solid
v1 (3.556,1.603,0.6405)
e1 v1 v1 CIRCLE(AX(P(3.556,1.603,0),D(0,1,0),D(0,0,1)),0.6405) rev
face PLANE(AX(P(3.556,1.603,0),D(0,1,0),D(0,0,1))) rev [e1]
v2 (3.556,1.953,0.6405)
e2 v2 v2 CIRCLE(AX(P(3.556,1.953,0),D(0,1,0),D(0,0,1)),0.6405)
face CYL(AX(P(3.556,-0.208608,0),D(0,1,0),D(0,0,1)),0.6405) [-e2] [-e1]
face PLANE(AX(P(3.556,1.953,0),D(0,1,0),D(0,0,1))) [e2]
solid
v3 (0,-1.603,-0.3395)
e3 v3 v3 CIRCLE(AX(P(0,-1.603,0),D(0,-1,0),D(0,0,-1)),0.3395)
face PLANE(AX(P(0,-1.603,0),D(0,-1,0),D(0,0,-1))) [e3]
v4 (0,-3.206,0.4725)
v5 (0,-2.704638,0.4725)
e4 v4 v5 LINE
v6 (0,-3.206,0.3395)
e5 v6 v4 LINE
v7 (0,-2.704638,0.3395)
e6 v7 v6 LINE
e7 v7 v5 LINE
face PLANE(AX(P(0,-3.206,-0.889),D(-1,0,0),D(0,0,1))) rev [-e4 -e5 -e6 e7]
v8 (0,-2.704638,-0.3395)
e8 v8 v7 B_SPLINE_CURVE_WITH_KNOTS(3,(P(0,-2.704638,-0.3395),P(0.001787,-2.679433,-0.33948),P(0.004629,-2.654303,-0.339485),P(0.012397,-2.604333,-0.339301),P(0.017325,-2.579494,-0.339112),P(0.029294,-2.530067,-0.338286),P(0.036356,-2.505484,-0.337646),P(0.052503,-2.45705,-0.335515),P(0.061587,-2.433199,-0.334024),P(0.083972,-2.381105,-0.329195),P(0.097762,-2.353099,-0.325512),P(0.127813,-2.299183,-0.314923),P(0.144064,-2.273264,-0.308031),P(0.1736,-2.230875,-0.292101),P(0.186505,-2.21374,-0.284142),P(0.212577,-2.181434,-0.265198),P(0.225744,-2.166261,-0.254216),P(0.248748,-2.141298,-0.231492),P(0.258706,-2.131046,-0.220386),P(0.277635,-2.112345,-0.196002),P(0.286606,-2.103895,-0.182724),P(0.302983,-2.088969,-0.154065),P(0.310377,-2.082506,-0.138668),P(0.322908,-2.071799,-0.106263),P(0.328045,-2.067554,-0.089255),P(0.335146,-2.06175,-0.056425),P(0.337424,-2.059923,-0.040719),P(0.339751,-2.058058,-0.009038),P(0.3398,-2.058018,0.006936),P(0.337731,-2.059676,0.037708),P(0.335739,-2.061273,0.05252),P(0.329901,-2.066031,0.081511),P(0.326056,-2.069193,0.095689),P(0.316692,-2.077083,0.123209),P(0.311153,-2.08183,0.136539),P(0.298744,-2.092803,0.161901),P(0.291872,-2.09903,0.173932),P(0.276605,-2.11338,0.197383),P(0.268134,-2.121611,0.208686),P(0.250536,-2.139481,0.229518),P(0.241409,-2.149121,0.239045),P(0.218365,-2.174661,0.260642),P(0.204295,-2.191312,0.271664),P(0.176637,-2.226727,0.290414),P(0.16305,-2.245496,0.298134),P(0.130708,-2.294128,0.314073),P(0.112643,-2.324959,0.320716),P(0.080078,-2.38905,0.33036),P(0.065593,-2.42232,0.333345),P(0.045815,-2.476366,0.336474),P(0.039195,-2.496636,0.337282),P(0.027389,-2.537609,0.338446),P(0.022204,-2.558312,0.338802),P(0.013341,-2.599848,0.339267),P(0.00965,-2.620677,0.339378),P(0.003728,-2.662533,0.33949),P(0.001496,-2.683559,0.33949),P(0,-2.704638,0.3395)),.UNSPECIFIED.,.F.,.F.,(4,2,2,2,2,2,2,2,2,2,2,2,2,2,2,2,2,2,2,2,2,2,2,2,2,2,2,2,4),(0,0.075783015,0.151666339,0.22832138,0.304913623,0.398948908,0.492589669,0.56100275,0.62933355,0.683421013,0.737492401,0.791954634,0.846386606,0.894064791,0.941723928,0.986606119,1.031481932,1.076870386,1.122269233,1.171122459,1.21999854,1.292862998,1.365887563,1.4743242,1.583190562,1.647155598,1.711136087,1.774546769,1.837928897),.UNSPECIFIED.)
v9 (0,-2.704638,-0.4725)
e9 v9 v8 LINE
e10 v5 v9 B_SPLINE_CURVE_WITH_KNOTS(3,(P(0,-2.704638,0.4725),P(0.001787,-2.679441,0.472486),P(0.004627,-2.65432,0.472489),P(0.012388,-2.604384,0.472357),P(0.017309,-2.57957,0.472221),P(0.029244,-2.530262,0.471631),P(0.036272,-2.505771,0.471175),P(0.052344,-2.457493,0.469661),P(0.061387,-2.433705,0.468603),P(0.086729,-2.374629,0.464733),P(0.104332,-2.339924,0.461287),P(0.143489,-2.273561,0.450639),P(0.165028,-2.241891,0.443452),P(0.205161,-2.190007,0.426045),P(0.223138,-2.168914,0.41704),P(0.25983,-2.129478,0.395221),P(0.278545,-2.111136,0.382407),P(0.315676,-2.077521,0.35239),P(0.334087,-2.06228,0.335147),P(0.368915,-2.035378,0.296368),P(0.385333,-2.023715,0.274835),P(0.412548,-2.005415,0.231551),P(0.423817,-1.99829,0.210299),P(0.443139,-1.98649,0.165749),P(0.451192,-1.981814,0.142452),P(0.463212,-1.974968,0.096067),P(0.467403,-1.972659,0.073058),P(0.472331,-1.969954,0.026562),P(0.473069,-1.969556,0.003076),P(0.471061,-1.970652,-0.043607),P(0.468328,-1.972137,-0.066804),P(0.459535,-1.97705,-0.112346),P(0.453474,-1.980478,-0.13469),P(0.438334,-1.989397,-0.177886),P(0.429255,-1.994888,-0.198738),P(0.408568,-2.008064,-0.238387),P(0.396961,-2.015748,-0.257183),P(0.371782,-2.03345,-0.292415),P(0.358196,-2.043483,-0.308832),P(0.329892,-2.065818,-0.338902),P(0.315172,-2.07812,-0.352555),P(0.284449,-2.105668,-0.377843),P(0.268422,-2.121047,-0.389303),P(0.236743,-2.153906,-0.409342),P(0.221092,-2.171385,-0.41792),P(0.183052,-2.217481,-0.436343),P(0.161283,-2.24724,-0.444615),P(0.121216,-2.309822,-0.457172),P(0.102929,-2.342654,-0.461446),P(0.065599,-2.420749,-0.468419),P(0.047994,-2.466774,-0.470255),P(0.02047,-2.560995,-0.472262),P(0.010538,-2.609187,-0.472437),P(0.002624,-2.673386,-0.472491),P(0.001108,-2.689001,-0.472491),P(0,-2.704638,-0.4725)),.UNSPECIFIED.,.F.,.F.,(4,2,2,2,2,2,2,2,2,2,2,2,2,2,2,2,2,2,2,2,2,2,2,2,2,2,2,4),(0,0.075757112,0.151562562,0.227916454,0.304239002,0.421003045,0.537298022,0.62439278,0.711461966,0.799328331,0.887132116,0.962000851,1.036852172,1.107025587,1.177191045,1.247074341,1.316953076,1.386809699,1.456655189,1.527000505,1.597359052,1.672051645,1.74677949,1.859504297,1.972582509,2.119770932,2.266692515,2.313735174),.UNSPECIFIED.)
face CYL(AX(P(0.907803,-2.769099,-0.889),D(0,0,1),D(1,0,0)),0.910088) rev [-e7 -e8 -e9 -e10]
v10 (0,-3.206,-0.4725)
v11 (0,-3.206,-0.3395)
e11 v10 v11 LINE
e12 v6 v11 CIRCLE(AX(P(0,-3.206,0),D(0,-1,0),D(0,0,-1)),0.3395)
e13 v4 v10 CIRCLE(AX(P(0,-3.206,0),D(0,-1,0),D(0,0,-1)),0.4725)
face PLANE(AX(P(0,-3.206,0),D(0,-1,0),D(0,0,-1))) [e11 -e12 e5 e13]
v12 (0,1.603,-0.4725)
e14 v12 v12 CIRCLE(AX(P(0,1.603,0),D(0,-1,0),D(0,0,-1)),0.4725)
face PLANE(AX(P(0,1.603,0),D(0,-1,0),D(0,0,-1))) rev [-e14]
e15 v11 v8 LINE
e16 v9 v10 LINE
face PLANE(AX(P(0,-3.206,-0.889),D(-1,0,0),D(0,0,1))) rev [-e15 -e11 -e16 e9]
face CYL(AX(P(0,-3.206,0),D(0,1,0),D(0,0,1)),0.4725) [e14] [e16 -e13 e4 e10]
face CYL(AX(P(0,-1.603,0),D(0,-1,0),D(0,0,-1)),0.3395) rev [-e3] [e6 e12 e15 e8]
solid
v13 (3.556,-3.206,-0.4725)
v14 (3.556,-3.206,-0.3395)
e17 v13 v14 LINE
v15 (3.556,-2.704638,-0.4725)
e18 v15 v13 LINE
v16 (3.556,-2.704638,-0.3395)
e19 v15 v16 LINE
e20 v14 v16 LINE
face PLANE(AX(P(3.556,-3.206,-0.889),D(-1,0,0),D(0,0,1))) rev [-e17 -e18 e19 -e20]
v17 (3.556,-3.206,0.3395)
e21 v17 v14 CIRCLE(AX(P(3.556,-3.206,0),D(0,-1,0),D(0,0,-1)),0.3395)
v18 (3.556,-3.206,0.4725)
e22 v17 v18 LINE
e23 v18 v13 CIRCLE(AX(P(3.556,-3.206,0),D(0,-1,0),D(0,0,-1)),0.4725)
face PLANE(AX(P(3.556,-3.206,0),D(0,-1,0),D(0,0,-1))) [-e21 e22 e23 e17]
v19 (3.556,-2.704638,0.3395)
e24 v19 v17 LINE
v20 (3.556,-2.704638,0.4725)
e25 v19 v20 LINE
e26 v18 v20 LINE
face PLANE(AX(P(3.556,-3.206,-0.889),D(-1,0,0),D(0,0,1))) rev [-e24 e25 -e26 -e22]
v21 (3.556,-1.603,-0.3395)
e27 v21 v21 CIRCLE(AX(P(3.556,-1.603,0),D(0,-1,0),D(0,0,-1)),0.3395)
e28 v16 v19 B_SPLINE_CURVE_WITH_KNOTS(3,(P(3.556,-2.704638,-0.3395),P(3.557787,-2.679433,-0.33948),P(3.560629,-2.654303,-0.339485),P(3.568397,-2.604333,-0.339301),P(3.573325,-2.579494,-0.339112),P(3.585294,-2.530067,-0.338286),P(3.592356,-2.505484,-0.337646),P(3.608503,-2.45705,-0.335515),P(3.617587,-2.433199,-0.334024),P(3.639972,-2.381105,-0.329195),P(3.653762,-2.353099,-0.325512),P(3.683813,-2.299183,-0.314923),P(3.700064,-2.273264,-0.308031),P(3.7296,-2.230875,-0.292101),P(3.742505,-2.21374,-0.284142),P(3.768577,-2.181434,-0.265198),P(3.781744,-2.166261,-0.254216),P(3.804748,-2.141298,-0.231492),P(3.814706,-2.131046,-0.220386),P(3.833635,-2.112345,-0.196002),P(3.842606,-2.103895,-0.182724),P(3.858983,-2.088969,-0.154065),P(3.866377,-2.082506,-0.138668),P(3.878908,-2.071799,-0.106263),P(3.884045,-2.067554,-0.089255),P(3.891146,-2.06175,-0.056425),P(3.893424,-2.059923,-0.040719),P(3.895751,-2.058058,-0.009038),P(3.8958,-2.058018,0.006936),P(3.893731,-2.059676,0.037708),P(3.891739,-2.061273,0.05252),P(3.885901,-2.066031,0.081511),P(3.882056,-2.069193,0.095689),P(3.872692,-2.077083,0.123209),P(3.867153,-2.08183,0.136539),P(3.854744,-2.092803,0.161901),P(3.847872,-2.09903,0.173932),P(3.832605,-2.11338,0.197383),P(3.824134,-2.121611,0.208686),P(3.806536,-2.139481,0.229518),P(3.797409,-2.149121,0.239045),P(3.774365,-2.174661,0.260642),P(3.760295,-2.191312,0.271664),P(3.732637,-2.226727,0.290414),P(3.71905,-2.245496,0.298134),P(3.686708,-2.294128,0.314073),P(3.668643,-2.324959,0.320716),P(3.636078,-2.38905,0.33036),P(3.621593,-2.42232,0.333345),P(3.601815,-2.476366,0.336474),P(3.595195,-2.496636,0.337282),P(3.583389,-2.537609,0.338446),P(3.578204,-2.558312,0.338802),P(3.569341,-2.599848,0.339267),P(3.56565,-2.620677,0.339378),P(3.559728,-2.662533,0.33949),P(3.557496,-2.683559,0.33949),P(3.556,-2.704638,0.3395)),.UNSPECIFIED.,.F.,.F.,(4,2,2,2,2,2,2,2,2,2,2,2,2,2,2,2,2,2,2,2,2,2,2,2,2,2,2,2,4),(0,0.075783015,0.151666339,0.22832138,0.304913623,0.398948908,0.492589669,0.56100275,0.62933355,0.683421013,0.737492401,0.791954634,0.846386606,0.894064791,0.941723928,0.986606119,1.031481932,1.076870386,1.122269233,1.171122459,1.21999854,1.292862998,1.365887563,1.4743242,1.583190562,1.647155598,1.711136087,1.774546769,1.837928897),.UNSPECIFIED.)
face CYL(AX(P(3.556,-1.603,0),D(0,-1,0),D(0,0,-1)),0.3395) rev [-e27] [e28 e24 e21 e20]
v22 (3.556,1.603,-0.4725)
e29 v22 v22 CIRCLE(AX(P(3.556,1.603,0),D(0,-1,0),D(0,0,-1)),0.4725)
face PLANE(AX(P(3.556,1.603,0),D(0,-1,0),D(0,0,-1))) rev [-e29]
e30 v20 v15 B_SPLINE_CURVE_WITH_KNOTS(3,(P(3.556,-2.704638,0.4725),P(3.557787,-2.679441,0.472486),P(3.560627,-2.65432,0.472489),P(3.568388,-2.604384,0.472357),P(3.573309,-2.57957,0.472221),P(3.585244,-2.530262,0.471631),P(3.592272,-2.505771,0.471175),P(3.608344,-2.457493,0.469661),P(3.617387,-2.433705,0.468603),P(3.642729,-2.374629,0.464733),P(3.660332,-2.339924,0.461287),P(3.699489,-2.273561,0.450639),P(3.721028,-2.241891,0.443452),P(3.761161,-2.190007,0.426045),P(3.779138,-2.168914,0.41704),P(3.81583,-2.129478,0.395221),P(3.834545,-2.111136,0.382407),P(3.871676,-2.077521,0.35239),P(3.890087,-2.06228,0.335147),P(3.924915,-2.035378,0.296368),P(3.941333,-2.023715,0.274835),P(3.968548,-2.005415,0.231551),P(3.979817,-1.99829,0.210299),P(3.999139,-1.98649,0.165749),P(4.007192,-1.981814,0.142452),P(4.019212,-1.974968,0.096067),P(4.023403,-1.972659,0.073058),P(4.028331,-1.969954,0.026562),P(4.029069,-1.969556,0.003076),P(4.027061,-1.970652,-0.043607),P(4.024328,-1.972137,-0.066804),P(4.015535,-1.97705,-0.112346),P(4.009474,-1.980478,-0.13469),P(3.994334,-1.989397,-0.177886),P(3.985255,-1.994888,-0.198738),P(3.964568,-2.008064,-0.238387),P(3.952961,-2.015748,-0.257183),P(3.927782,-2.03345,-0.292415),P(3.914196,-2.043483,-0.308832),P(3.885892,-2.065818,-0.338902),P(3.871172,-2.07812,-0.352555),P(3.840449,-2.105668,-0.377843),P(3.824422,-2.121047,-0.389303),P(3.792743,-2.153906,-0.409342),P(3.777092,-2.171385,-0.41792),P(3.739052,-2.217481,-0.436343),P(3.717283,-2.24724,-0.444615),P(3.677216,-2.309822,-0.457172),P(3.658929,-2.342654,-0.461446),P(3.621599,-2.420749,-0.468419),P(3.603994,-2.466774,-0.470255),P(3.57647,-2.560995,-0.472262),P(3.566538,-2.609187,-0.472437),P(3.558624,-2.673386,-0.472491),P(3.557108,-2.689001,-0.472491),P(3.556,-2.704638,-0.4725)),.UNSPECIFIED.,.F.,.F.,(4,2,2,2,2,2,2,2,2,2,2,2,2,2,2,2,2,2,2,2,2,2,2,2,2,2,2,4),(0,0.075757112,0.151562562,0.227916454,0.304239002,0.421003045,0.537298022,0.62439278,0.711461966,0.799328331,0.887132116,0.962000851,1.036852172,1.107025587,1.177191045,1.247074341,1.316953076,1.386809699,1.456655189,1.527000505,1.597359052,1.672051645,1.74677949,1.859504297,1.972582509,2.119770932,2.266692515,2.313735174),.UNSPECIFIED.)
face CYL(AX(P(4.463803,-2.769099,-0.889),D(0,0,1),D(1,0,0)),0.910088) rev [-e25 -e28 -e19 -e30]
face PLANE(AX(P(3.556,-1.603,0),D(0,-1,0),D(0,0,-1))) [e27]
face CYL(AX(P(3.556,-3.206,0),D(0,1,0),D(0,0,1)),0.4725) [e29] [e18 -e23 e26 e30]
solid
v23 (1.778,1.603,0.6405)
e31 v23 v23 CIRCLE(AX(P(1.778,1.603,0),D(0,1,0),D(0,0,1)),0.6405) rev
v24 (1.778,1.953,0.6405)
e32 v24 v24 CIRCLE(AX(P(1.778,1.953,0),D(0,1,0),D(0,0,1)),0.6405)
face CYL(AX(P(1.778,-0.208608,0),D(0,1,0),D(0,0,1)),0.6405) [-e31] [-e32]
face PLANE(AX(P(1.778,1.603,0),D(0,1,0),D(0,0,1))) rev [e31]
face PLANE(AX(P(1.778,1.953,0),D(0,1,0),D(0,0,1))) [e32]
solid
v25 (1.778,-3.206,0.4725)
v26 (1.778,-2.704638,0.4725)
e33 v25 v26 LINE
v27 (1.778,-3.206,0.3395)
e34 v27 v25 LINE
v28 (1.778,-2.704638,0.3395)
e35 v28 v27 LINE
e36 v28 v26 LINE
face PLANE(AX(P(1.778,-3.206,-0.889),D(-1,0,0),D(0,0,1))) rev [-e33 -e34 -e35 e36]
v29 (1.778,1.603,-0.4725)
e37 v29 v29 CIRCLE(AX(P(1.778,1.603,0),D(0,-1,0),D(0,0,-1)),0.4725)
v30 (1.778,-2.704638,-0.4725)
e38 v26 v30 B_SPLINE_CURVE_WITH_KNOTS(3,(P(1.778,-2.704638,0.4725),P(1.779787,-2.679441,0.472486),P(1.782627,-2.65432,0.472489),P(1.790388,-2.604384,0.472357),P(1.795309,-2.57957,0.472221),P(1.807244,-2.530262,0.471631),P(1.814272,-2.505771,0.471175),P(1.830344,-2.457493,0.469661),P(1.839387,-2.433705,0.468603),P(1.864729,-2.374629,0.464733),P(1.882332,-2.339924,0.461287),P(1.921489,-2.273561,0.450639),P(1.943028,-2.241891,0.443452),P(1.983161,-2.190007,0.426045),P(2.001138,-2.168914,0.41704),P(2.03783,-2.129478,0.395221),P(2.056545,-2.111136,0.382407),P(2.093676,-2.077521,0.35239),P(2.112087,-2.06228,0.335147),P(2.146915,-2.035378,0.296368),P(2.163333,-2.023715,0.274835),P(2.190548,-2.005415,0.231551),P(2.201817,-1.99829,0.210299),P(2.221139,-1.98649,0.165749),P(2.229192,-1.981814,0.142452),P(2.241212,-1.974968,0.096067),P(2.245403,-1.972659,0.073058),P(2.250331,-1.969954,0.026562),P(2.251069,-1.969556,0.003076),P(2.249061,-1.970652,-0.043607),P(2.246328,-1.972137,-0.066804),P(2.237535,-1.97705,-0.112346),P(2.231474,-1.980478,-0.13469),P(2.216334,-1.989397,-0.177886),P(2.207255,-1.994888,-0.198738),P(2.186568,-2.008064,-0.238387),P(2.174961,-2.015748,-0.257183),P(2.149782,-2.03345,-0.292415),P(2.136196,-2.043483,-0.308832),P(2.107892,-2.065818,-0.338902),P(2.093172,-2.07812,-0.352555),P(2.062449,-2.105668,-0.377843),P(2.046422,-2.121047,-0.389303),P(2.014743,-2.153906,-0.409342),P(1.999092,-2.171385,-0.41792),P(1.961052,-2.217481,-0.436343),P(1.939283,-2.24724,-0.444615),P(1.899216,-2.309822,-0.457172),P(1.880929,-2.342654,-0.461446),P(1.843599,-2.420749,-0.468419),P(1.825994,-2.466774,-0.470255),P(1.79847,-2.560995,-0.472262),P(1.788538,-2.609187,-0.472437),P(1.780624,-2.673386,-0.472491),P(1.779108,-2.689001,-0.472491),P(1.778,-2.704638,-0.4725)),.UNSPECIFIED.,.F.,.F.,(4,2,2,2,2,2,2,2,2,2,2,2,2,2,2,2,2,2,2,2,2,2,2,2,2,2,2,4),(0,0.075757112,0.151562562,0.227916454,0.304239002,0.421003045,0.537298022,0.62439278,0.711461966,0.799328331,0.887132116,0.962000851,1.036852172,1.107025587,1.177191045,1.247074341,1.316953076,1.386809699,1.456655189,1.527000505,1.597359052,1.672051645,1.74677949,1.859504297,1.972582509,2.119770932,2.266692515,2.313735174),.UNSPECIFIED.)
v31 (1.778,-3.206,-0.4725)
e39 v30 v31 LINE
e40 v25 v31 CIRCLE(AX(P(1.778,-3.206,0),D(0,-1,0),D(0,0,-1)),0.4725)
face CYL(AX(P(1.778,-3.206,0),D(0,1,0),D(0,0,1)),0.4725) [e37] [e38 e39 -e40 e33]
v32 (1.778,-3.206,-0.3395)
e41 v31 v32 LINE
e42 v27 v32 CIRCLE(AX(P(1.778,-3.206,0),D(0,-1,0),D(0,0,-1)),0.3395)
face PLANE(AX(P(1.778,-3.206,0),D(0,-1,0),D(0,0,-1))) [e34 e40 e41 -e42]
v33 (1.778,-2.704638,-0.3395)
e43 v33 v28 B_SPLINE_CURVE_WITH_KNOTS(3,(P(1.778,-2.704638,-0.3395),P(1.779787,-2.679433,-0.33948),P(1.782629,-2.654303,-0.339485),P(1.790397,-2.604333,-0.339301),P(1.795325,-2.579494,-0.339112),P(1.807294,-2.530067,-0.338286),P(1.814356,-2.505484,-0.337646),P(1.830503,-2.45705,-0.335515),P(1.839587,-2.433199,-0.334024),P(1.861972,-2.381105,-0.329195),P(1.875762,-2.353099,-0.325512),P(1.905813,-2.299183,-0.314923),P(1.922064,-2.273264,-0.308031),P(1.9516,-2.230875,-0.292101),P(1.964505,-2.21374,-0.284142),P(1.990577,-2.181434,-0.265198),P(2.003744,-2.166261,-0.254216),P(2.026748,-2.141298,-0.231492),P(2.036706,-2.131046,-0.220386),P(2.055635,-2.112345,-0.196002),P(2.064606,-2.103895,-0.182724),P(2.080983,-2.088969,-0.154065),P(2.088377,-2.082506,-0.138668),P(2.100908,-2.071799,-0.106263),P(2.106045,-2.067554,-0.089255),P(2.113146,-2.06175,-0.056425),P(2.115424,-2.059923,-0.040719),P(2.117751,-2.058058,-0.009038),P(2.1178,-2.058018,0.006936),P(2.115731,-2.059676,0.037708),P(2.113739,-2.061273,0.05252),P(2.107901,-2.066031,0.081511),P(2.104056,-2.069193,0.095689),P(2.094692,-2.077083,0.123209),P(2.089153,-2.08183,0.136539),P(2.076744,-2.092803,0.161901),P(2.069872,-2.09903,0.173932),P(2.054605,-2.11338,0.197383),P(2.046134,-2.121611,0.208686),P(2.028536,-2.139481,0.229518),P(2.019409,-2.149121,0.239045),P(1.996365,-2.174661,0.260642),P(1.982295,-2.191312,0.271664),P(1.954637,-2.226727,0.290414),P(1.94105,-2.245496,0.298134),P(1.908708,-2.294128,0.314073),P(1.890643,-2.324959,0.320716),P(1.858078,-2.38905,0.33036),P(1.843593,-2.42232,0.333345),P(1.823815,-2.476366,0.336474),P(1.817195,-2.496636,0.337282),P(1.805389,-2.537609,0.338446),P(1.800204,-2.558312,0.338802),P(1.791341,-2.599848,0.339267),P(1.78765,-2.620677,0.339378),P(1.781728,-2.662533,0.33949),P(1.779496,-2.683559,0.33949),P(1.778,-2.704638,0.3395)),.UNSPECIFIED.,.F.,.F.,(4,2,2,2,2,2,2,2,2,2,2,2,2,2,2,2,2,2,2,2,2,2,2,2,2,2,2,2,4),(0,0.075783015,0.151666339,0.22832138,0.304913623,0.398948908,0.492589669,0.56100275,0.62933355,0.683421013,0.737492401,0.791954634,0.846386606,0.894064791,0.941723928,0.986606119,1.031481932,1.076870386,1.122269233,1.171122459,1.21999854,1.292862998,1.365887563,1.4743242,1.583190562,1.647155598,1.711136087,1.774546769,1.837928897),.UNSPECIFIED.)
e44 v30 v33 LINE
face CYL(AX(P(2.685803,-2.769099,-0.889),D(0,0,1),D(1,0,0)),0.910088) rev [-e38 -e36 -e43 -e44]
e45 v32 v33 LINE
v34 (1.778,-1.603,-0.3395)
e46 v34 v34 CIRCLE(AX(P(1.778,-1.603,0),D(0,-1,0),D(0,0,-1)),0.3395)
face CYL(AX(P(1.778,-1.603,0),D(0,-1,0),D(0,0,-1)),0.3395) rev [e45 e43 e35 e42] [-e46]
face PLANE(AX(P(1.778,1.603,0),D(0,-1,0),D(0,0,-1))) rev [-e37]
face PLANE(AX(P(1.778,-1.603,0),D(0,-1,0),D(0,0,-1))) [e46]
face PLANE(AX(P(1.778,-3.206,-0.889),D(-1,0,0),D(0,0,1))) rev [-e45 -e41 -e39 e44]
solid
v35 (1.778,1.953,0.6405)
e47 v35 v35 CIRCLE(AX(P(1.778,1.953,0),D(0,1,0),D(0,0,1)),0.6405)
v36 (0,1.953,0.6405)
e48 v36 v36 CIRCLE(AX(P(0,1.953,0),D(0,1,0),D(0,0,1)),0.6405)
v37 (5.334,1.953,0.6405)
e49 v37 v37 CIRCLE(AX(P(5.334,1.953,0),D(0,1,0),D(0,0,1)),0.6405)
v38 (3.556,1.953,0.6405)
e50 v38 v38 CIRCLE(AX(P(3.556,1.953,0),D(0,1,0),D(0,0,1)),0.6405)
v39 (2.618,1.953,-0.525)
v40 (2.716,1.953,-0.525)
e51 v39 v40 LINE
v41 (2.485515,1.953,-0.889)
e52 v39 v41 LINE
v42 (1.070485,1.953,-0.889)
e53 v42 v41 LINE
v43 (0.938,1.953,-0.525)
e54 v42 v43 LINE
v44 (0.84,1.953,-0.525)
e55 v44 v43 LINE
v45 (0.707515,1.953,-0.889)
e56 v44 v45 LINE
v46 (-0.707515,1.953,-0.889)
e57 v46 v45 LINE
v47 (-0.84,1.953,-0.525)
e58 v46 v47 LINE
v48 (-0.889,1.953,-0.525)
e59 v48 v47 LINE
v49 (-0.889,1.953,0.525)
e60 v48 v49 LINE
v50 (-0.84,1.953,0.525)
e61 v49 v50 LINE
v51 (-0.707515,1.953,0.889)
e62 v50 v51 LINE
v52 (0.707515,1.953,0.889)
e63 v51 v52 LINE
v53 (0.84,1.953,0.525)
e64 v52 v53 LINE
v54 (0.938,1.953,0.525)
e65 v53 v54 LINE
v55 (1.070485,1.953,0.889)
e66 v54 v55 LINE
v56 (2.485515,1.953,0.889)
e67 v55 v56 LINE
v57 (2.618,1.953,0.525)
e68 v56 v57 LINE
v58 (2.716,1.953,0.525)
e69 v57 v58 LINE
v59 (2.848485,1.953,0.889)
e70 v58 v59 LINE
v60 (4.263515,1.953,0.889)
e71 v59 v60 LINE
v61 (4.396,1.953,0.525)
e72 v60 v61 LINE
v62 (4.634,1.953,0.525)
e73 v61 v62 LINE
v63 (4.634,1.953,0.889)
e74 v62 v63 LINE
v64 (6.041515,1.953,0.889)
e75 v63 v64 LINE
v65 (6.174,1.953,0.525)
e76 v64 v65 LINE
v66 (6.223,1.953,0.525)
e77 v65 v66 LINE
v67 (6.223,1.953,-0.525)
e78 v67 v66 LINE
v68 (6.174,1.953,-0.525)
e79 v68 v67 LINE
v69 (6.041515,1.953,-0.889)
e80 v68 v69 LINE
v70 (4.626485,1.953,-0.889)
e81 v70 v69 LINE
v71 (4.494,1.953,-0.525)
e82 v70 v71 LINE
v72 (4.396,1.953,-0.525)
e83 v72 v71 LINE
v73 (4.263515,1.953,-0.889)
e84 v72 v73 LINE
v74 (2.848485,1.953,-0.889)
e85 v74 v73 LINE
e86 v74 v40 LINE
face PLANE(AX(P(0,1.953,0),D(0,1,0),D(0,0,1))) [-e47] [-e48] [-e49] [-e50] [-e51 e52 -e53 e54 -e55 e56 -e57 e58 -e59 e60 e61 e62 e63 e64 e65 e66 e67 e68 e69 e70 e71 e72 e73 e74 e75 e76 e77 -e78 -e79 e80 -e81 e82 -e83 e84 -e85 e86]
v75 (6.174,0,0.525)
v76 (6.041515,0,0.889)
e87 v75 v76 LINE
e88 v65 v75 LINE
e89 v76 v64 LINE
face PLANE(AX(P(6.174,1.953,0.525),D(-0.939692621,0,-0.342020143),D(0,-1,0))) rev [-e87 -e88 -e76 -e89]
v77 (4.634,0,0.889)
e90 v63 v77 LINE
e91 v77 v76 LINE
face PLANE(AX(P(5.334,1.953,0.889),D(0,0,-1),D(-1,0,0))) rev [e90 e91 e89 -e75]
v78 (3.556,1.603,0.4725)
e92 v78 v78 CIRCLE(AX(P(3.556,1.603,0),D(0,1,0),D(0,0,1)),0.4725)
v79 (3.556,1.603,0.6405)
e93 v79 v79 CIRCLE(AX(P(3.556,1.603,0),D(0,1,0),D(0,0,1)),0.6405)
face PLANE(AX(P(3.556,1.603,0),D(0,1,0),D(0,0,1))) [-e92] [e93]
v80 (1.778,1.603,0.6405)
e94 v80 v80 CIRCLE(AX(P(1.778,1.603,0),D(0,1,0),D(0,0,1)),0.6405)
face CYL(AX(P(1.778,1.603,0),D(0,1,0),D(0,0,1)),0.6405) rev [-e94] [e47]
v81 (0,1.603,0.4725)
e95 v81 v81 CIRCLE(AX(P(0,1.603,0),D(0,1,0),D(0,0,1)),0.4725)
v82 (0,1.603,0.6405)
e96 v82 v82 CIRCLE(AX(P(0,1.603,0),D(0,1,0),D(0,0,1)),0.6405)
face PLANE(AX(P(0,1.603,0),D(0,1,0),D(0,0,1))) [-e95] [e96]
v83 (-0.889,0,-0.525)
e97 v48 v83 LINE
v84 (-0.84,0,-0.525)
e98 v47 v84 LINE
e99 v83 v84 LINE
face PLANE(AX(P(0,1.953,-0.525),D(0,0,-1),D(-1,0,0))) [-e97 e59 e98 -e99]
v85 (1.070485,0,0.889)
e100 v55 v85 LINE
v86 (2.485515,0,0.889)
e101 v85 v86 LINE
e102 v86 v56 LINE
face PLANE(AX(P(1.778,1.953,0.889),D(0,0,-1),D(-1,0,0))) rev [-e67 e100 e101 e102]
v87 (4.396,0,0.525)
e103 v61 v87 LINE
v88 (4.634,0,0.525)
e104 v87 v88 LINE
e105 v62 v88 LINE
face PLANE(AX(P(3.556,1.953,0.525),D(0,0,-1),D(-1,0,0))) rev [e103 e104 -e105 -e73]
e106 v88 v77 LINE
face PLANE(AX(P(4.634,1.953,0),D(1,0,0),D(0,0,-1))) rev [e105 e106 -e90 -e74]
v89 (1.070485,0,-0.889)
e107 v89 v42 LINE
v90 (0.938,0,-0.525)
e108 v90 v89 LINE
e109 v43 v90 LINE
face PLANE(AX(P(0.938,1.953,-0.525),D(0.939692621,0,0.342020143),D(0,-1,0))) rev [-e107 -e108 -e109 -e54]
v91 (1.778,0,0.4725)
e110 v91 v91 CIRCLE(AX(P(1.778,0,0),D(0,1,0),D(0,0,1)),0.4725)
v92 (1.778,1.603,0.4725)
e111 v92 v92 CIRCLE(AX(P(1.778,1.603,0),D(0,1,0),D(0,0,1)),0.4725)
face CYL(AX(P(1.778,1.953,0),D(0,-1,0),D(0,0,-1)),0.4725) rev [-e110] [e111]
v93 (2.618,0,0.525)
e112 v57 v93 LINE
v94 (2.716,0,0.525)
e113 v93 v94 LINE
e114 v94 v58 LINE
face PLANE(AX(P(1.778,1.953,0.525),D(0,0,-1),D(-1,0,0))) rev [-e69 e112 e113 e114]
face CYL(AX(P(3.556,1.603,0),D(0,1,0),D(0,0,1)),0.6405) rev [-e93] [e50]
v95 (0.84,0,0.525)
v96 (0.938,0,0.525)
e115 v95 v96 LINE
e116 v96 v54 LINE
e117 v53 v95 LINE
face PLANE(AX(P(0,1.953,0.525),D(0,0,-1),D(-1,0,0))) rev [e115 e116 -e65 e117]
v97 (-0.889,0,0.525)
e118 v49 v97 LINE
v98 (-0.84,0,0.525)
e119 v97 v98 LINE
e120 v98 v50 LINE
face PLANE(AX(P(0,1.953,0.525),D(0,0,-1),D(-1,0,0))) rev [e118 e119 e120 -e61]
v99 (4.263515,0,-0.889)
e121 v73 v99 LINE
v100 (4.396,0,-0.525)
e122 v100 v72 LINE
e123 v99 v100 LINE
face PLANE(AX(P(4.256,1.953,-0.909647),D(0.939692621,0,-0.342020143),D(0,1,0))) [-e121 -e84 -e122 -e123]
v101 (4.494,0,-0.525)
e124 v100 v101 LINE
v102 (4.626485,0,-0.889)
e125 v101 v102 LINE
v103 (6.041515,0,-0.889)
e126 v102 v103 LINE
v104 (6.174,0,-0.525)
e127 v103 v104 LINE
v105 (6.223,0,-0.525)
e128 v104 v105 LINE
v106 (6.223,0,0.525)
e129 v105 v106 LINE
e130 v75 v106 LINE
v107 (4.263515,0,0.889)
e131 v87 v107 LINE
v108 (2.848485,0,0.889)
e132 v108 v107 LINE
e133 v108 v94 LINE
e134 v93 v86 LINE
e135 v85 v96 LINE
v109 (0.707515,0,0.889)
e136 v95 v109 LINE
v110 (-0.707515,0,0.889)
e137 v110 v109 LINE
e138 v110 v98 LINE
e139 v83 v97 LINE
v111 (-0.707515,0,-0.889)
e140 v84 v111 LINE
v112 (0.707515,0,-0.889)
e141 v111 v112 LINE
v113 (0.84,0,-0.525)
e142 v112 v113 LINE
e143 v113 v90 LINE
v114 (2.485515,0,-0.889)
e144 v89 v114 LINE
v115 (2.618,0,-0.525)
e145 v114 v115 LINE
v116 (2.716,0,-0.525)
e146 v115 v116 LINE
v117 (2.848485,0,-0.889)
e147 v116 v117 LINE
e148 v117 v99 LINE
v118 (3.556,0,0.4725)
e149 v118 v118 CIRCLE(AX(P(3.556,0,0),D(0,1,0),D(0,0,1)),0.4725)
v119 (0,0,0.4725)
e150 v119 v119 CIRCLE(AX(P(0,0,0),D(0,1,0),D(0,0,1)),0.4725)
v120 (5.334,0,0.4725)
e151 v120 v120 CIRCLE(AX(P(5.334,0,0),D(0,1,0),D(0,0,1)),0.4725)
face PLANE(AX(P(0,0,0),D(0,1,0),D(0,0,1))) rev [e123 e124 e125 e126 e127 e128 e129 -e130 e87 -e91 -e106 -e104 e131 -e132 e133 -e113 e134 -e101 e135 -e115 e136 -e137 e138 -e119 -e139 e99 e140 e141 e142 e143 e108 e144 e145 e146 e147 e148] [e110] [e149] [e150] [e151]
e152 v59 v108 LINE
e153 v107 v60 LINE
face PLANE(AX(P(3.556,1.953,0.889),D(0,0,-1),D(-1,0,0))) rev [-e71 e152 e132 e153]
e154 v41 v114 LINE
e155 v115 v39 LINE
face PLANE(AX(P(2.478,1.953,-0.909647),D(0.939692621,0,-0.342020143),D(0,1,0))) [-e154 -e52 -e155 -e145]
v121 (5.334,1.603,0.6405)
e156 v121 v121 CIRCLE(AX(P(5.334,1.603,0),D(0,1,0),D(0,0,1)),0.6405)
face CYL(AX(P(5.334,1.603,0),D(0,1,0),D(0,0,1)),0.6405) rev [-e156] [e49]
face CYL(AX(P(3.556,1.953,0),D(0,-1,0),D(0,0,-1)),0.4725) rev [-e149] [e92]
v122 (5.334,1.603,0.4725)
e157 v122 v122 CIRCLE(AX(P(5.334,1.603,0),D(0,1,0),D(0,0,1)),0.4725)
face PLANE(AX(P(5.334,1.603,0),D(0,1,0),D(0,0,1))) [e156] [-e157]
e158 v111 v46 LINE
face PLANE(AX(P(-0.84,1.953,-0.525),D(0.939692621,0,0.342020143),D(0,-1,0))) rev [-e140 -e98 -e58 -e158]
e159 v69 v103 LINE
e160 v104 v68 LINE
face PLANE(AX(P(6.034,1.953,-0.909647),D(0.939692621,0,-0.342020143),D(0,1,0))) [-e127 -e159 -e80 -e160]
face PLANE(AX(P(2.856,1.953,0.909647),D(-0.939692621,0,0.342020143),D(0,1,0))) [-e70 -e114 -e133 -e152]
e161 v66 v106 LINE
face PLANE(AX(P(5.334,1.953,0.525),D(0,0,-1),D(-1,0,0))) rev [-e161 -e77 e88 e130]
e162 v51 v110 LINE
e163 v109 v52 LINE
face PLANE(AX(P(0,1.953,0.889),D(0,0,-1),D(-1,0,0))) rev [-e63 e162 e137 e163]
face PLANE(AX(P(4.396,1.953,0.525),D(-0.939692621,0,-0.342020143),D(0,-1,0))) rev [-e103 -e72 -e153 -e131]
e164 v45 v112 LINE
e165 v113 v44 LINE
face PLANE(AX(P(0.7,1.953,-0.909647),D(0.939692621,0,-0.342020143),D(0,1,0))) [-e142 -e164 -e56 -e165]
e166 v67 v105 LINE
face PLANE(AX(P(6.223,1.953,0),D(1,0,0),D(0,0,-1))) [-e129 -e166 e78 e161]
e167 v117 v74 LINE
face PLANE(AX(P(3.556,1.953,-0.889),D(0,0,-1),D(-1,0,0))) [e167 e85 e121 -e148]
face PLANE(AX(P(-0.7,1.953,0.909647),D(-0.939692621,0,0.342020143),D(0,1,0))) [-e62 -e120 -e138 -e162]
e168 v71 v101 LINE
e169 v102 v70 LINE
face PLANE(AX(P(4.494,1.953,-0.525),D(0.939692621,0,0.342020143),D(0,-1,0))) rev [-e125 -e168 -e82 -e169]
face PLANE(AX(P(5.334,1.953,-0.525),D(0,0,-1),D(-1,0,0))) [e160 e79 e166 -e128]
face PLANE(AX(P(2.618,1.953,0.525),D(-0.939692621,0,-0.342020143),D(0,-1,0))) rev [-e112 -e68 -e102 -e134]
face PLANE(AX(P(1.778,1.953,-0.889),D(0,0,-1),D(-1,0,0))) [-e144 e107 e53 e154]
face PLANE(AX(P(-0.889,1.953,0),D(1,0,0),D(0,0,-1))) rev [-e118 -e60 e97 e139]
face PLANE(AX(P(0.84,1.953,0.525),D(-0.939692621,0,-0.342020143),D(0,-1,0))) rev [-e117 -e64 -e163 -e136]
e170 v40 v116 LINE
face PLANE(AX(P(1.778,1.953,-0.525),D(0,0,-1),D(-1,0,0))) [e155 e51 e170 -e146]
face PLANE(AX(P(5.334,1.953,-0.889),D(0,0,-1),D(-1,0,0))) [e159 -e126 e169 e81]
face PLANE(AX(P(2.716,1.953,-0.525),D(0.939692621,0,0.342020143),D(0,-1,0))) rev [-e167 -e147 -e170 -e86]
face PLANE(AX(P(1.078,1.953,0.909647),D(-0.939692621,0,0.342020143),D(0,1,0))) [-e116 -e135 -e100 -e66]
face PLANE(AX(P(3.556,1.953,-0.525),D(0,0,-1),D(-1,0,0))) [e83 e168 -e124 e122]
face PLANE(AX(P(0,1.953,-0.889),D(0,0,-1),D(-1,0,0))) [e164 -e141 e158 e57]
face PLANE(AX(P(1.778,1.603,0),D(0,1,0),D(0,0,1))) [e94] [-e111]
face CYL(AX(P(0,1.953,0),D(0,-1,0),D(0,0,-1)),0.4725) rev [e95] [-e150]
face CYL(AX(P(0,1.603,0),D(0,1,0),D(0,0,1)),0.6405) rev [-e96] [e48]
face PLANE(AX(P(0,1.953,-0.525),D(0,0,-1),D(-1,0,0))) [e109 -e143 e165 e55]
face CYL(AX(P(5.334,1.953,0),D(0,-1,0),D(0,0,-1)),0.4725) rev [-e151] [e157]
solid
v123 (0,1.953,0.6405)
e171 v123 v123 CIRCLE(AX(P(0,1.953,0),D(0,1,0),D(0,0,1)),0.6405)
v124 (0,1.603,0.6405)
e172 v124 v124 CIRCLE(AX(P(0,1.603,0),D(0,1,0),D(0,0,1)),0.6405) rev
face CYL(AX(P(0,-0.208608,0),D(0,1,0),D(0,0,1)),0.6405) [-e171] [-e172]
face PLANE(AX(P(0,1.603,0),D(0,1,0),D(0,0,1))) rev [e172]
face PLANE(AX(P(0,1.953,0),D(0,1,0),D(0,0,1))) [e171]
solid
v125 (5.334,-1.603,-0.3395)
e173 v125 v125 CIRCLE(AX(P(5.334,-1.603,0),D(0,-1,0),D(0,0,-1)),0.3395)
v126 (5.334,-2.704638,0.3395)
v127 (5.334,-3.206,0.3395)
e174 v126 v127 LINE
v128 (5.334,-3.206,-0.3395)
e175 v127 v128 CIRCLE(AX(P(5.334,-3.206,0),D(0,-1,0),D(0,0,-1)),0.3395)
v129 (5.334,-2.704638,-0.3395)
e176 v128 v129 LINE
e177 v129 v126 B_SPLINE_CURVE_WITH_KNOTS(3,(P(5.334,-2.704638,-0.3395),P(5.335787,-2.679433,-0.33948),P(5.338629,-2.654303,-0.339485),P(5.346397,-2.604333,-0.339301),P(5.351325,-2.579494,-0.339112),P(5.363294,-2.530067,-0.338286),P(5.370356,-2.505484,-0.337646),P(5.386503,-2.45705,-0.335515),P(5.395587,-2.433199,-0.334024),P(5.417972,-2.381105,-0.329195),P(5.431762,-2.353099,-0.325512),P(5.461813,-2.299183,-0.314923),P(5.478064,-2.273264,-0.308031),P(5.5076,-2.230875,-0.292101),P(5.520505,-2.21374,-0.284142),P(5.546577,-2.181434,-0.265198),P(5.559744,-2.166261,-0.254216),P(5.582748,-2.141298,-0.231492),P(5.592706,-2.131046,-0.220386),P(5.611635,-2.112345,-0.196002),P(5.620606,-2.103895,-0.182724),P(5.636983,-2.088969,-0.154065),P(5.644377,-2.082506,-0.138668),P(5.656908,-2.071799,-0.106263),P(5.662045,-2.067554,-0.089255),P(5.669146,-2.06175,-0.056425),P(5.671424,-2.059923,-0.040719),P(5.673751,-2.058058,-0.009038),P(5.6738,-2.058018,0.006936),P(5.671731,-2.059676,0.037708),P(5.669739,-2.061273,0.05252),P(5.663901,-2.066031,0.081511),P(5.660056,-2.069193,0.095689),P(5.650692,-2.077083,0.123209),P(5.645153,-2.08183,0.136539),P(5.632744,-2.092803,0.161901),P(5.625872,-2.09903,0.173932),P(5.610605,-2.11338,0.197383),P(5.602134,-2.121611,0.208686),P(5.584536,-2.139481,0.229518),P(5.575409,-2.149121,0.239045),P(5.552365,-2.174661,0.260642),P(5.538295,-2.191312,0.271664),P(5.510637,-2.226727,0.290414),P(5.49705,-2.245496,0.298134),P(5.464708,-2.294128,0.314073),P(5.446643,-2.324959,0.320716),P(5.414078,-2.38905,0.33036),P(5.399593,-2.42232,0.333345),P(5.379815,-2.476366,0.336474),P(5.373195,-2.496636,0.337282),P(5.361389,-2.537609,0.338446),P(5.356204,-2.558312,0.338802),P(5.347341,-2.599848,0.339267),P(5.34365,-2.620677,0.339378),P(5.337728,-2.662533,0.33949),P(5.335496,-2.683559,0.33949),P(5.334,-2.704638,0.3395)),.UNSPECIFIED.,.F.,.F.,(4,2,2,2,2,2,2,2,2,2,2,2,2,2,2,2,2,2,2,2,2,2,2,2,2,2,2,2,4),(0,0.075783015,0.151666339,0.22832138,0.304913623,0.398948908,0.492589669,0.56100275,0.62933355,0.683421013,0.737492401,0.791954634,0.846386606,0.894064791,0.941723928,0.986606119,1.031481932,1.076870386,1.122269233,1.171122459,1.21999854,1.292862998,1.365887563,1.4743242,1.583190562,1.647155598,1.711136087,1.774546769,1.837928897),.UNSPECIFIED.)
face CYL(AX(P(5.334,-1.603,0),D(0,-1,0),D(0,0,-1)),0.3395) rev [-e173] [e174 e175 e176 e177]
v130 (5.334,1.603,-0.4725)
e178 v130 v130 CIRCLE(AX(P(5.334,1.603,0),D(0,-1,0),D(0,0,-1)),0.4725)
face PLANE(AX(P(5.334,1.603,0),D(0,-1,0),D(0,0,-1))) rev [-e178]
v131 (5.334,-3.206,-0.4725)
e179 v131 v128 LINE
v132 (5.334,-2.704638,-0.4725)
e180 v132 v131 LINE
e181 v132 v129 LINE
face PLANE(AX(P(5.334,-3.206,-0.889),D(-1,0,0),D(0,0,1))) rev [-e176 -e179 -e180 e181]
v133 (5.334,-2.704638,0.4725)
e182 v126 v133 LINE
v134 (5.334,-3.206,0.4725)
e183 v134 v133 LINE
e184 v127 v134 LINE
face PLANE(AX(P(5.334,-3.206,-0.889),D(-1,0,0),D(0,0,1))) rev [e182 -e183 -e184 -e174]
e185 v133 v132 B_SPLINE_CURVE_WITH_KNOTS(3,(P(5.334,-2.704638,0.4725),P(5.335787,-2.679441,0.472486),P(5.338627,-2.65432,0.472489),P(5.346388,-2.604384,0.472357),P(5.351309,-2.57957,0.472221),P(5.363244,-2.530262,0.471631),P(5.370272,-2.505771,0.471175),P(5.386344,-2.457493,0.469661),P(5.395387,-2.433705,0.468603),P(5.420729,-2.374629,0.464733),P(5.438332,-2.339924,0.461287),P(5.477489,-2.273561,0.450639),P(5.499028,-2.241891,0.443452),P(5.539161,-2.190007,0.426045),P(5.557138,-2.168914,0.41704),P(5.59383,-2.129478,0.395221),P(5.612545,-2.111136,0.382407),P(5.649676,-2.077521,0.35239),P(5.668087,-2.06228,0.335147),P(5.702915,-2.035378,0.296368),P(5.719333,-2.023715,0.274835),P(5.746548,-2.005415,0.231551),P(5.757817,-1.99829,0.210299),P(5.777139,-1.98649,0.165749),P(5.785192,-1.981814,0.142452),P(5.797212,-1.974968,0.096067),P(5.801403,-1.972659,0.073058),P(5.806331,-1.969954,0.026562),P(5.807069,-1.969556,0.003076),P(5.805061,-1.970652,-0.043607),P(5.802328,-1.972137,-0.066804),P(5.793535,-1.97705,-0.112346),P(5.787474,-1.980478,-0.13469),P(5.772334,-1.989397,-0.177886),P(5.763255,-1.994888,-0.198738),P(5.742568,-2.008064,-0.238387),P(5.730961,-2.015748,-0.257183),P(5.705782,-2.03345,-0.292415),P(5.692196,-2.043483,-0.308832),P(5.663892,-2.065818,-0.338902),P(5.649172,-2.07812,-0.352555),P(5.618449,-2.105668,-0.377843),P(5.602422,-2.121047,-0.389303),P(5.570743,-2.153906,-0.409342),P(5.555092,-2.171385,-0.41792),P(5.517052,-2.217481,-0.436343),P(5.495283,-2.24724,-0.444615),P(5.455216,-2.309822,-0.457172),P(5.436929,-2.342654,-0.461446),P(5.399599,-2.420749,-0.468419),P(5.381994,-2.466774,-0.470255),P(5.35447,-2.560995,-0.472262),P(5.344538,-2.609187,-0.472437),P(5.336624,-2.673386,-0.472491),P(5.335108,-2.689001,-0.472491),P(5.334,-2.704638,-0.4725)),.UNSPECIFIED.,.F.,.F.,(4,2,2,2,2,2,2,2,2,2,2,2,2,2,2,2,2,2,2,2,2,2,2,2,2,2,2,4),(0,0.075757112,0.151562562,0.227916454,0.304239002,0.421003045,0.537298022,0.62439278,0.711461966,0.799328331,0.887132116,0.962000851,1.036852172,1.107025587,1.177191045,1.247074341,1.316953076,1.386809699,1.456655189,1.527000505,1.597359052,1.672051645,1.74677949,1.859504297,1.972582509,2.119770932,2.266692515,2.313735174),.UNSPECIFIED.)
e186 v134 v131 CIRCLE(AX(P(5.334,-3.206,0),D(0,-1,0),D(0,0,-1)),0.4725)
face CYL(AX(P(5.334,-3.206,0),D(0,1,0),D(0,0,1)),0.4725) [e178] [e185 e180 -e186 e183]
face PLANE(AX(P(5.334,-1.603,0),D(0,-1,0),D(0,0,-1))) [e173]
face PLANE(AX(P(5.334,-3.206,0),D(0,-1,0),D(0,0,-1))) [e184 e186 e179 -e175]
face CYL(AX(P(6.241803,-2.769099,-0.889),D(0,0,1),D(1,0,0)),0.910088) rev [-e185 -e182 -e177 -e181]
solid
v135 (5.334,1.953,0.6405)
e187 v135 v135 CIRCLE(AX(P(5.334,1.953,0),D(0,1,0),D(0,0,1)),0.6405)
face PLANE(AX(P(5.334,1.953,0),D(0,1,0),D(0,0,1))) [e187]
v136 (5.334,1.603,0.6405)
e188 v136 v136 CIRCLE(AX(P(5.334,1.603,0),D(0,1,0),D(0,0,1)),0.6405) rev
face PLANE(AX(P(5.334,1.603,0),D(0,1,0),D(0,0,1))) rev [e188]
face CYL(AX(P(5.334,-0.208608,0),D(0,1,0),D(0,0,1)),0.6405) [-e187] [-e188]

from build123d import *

# Parameters (mm, degrees)
SKETCH1_R              = 0.675
BOSS_EXTRUDE1_DEPTH    = 2.79
CHAMFER3_SIZE          = 0.2
CHAMFER3_SIZE_2        = 0.549495484
SKETCH2_R              = 0.915
CUT_EXTRUDE1_DEPTH     = 0.5
SKETCH3_R              = 0.915
BOSS_EXTRUDE2_DEPTH    = 0.5
SKETCH4_R              = 0.675
BOSS_EXTRUDE3_DEPTH    = 6.87
SKETCH5_R              = 0.485
CUT_EXTRUDE2_DEPTH     = 2.29
CUT_EXTRUDE3_DEPTH     = 5.919573152
LPATTERN1_START        = 2.29
LPATTERN1_OUTLINE_R    = 0.915
LPATTERN1_DEPTH        = 0.5
LPATTERN1_2_OUTLINE_R  = 0.915
LPATTERN1_2_DEPTH      = 0.5
LPATTERN1_3_OUTLINE_R  = 0.675
LPATTERN1_3_DEPTH      = 2.29
LPATTERN1_4_OUTLINE_R  = 0.915
LPATTERN1_4_DEPTH      = 0.5
LPATTERN1_START_2      = -2.29
LPATTERN1_5_OUTLINE_R  = 0.675
LPATTERN1_5_DEPTH      = 4.58
LPATTERN1_START_3      = -4.58
LPATTERN1_6_DEPTH      = 2.29
LPATTERN1_START_4      = -2.814094852
LPATTERN1_7_DEPTH      = 0.524094852
LPATTERN1_START_5      = -3.863768611
LPATTERN1_8_DEPTH      = 1.049673759
LPATTERN1_START_6      = -2
LPATTERN1_9_DEPTH      = 4
LPATTERN1_10_OUTLINE_R = 0.675
LPATTERN1_10_DEPTH     = 4.58
LPATTERN1_11_DEPTH     = 2.29
LPATTERN1_12_DEPTH     = 0.524094852
LPATTERN1_13_DEPTH     = 1.049673759
LPATTERN1_14_DEPTH     = 4
LPATTERN1_15_OUTLINE_R = 0.915
LPATTERN1_15_DEPTH     = 0.5
LPATTERN1_16_OUTLINE_R = 0.675
LPATTERN1_16_DEPTH     = 4.58
LPATTERN1_17_DEPTH     = 2.29
LPATTERN1_18_DEPTH     = 0.524094852
LPATTERN1_19_DEPTH     = 1.049673759
LPATTERN1_20_DEPTH     = 4
SCALE1_SCALE           = 0.7


with BuildPart() as part:
    # Sketch1 → Boss-Extrude1 (new body)
    with BuildSketch(Plane(origin=(0, 0, 0), x_dir=(1, 0, 0), z_dir=(0, 1, 0))):
        Polygon((1, 1.27), (-1, 1.27), (-1, 0.75), (-1.27, 0.75), (-1.27, -0.75), (-1, -0.75), (-1, -1.27), (1, -1.27), (1, -0.75), (1.27, -0.75), (1.27, 0.75), (1, 0.75), align=None)
        with Locations(Location((0, 0, 0), (0, 0, 270))):
            Circle(SKETCH1_R, mode=Mode.SUBTRACT)
    extrude(amount=BOSS_EXTRUDE1_DEPTH)

    # Chamfer3
    # the kernel refuses this chamfer: 0.549495484, 0.2 mm, written as the material it adds along each edge
    with BuildSketch(Plane(origin=(1, 0, -0.75), x_dir=(1, 0, 0), z_dir=(0, 1, 0))) as chamfer3_piece_1_section:
        Polygon((CHAMFER3_SIZE, 0), (0, CHAMFER3_SIZE_2), (0, 0), align=None)
    chamfer3_piece_1 = extrude(amount=2.79, mode=Mode.PRIVATE)
    chamfer3_piece_1 = split(chamfer3_piece_1, bisect_by=Plane(origin=(1, 0, -1.27), z_dir=(0, 0, 1)), keep=Keep.TOP, mode=Mode.PRIVATE)
    add(chamfer3_piece_1)
    with BuildSketch(Plane(origin=(-1, 0, -0.75), x_dir=(0, 0, -1), z_dir=(0, 1, 0))) as chamfer3_piece_2_section:
        Polygon((CHAMFER3_SIZE_2, 0), (0, CHAMFER3_SIZE), (0, 0), align=None)
    chamfer3_piece_2 = extrude(amount=2.79, mode=Mode.PRIVATE)
    chamfer3_piece_2 = split(chamfer3_piece_2, bisect_by=Plane(origin=(-1, 0, -1.27), z_dir=(0, 0, 1)), keep=Keep.TOP, mode=Mode.PRIVATE)
    add(chamfer3_piece_2)
    with BuildSketch(Plane(origin=(-1, 0, 0.75), x_dir=(-1, 0, 0), z_dir=(0, 1, 0))) as chamfer3_piece_3_section:
        Polygon((CHAMFER3_SIZE, 0), (0, CHAMFER3_SIZE_2), (0, 0), align=None)
    chamfer3_piece_3 = extrude(amount=2.79, mode=Mode.PRIVATE)
    chamfer3_piece_3 = split(chamfer3_piece_3, bisect_by=Plane(origin=(-1, 0, 1.27), z_dir=(0, 0, -1)), keep=Keep.TOP, mode=Mode.PRIVATE)
    add(chamfer3_piece_3)
    with BuildSketch(Plane(origin=(1, 0, 0.75), x_dir=(0, 0, 1), z_dir=(0, 1, 0))) as chamfer3_piece_4_section:
        Polygon((CHAMFER3_SIZE_2, 0), (0, CHAMFER3_SIZE), (0, 0), align=None)
    chamfer3_piece_4 = extrude(amount=2.79, mode=Mode.PRIVATE)
    chamfer3_piece_4 = split(chamfer3_piece_4, bisect_by=Plane(origin=(1, 0, 1.27), z_dir=(0, 0, -1)), keep=Keep.TOP, mode=Mode.PRIVATE)
    add(chamfer3_piece_4)

    # Sketch2 → Cut-Extrude1 (cut)
    with BuildSketch(Plane(origin=(0, 2.79, 0), x_dir=(1, 0, 0), z_dir=(0, 1, 0))):
        with Locations(Location((0, 0, 0), (0, 0, 270))):
            Circle(SKETCH2_R)
    extrude(amount=-CUT_EXTRUDE1_DEPTH, mode=Mode.SUBTRACT)

    # LPattern1 3 outline → LPattern1 3 (add)
    with BuildSketch(Plane(origin=(0, 0, 0), x_dir=(1, 0, 0), z_dir=(0, 1, 0))):
        Polygon((1.529264522, 1.27), (1.34, 0.75), (1.27, 0.75), (1.27, -0.75), (1.34, -0.75), (1.529264522, -1.27), (3.550735478, -1.27), (3.74, -0.75), (3.88, -0.75), (4.069264522, -1.27), (6.090735478, -1.27), (6.28, -0.75), (6.62, -0.75), (6.62, -1.27), (8.630735478, -1.27), (8.82, -0.75), (8.89, -0.75), (8.89, 0.75), (8.82, 0.75), (8.630735478, 1.27), (6.609264522, 1.27), (6.42, 0.75), (6.28, 0.75), (6.090735478, 1.27), (4.069264522, 1.27), (3.88, 0.75), (3.74, 0.75), (3.550735478, 1.27), align=None)
        with Locations((2.54, 0)):
            Circle(LPATTERN1_3_OUTLINE_R, mode=Mode.SUBTRACT)
        with Locations((5.08, 0)):
            Circle(LPATTERN1_3_OUTLINE_R, mode=Mode.SUBTRACT)
        with Locations((7.62, 0)):
            Circle(LPATTERN1_3_OUTLINE_R, mode=Mode.SUBTRACT)
    extrude(amount=LPATTERN1_3_DEPTH)

    # LPattern1 4 outline → LPattern1 4 (add)
    with BuildSketch(Plane(origin=(0, 0, 0), x_dir=(1, 0, 0), z_dir=(0, 1, 0)).offset(LPATTERN1_START)):
        Polygon((1.529264522, 1.27), (1.34, 0.75), (1.27, 0.75), (1.27, -0.75), (1.34, -0.75), (1.529264522, -1.27), (3.550735478, -1.27), (3.74, -0.75), (3.88, -0.75), (4.069264522, -1.27), (6.090735478, -1.27), (6.28, -0.75), (6.62, -0.75), (6.62, -1.27), (8.630735478, -1.27), (8.82, -0.75), (8.89, -0.75), (8.89, 0.75), (8.82, 0.75), (8.630735478, 1.27), (6.609264522, 1.27), (6.42, 0.75), (6.28, 0.75), (6.090735478, 1.27), (4.069264522, 1.27), (3.88, 0.75), (3.74, 0.75), (3.550735478, 1.27), align=None)
        with Locations((2.54, 0)):
            Circle(LPATTERN1_4_OUTLINE_R, mode=Mode.SUBTRACT)
        with Locations((5.08, 0)):
            Circle(LPATTERN1_4_OUTLINE_R, mode=Mode.SUBTRACT)
        with Locations((7.62, 0)):
            Circle(LPATTERN1_4_OUTLINE_R, mode=Mode.SUBTRACT)
    extrude(amount=LPATTERN1_4_DEPTH)


with BuildPart() as body_2:
    # Sketch3 → Boss-Extrude2 (new body)
    with BuildSketch(Plane(origin=(0, 2.79, 0), x_dir=(1, 0, 0), z_dir=(0, 1, 0))):
        with Locations(Location((0, 0, 0), (0, 0, 270))):
            Circle(SKETCH3_R)
    extrude(amount=-BOSS_EXTRUDE2_DEPTH)


with BuildPart() as body_3:
    # Sketch4 → Boss-Extrude3 (new body)
    with BuildSketch(Plane.XZ.offset(-2.29)):
        with Locations(Location((0, 0, 0), (0, 0, 90))):
            Circle(SKETCH4_R)
    extrude(amount=BOSS_EXTRUDE3_DEPTH)

    # Sketch5 → Cut-Extrude2 (cut)
    with BuildSketch(Plane.XZ.offset(4.58)):
        with Locations(Location((0, 0, 0), (0, 0, 270))):
            Circle(SKETCH5_R)
    extrude(amount=-CUT_EXTRUDE2_DEPTH, mode=Mode.SUBTRACT)

    # Sketch6 → Cut-Extrude3 (cut, symmetric)
    with BuildSketch(Plane.XY):
        with BuildLine():
            Line((0.675, -4.58), (0, -4.58))
            Line((0, -4.58), (0, -3.863768511))
            ThreePointArc((0, -3.863768511), (0.203322314, -3.25264809), (0.675, -2.814095593))
            Line((0.675, -2.814095593), (0.675, -4.58))
        make_face()
    extrude(amount=CUT_EXTRUDE3_DEPTH, both=True, mode=Mode.SUBTRACT)


with BuildPart() as body_4:
    # LPattern1: read off the stored shape, not the designer's step
    # LPattern1 outline → LPattern1 (new body)
    with BuildSketch(Plane(origin=(0, 0, 0), x_dir=(1, 0, 0), z_dir=(0, 1, 0)).offset(LPATTERN1_START)):
        with Locations((7.62, 0)):
            Circle(LPATTERN1_OUTLINE_R)
    extrude(amount=LPATTERN1_DEPTH)


with BuildPart() as body_5:
    # LPattern1 2 outline → LPattern1 2 (new body)
    with BuildSketch(Plane(origin=(0, 0, 0), x_dir=(1, 0, 0), z_dir=(0, 1, 0)).offset(LPATTERN1_START)):
        with Locations((2.54, 0)):
            Circle(LPATTERN1_2_OUTLINE_R)
    extrude(amount=LPATTERN1_2_DEPTH)


with BuildPart() as body_6:
    # LPattern1 5 outline → LPattern1 5 (new body)
    with BuildSketch(Plane(origin=(0, 0, 0), x_dir=(1, 0, 0), z_dir=(0, 1, 0)).offset(LPATTERN1_START_2)):
        with Locations((5.08, 0)):
            Circle(LPATTERN1_5_OUTLINE_R)
    extrude(amount=LPATTERN1_5_DEPTH)

    # LPattern1 6 outline → LPattern1 6 (add)
    with BuildSketch(Plane(origin=(0, 0, 0), x_dir=(1, 0, 0), z_dir=(0, 1, 0)).offset(LPATTERN1_START_3)):
        with BuildLine():
            Line((5.08, 0.485), (5.08, 0.675))
            ThreePointArc((5.08, 0.675), (4.405, 0), (5.08, -0.675))
            Line((5.08, -0.675), (5.08, -0.485))
            ThreePointArc((5.08, -0.485), (4.595, 0), (5.08, 0.485))
        make_face()
    extrude(amount=LPATTERN1_6_DEPTH)

    # LPattern1 7 outline → LPattern1 7 (add)
    with BuildSketch(Plane(origin=(0, 0, 0), x_dir=(1, 0, 0), z_dir=(0, 1, 0)).offset(LPATTERN1_START_4)):
        with BuildLine():
            ThreePointArc((5.08, -0.675), (5.755, 0), (5.08, 0.675))
            Line((5.08, 0.675), (5.08, 0.485))
            ThreePointArc((5.08, 0.485), (5.565, 0), (5.08, -0.485))
            Line((5.08, -0.485), (5.08, -0.675))
        make_face()
    extrude(amount=LPATTERN1_7_DEPTH)

    # LPattern1 8 outline → LPattern1 8 (add)
    with BuildSketch(Plane(origin=(0, 0, 0), x_dir=(1, 0, 0), z_dir=(0, 1, 0)).offset(LPATTERN1_START_5)):
        with BuildLine():
            ThreePointArc((5.08, 0.485), (5.565, 0), (5.08, -0.485))
            Line((5.08, -0.485), (5.08, -0.675))
            ThreePointArc((5.08, -0.675), (5.755, 0), (5.08, 0.675))
            Line((5.08, 0.675), (5.08, 0.485))
        make_face()
    extrude(amount=LPATTERN1_8_DEPTH)

    # LPattern1 9 outline → LPattern1 9 (cut)
    with BuildSketch(Plane.XY.offset(LPATTERN1_START_6)):
        with BuildLine():
            Line((7, -2.13622338), (5.755154284, -2.814011576))
            ThreePointArc((5.755154284, -2.814011576), (5.283369826, -3.25257421), (5.08, -3.863768511))
            Line((5.08, -3.863768511), (7, -3.863768611))
            Line((7, -3.863768611), (7, -2.13622338))
        make_face()
    extrude(amount=LPATTERN1_9_DEPTH, mode=Mode.SUBTRACT)


with BuildPart() as body_7:
    # LPattern1 10 outline → LPattern1 10 (new body)
    with BuildSketch(Plane(origin=(0, 0, 0), x_dir=(1, 0, 0), z_dir=(0, 1, 0)).offset(LPATTERN1_START_2)):
        with Locations((7.62, 0)):
            Circle(LPATTERN1_10_OUTLINE_R)
    extrude(amount=LPATTERN1_10_DEPTH)

    # LPattern1 11 outline → LPattern1 11 (add)
    with BuildSketch(Plane(origin=(0, 0, 0), x_dir=(1, 0, 0), z_dir=(0, 1, 0)).offset(LPATTERN1_START_3)):
        with BuildLine():
            Line((7.62, 0.485), (7.62, 0.675))
            ThreePointArc((7.62, 0.675), (6.945, 0), (7.62, -0.675))
            Line((7.62, -0.675), (7.62, -0.485))
            ThreePointArc((7.62, -0.485), (7.135, 0), (7.62, 0.485))
        make_face()
    extrude(amount=LPATTERN1_11_DEPTH)

    # LPattern1 12 outline → LPattern1 12 (add)
    with BuildSketch(Plane(origin=(0, 0, 0), x_dir=(1, 0, 0), z_dir=(0, 1, 0)).offset(LPATTERN1_START_4)):
        with BuildLine():
            ThreePointArc((7.62, -0.675), (8.295, 0), (7.62, 0.675))
            Line((7.62, 0.675), (7.62, 0.485))
            ThreePointArc((7.62, 0.485), (8.105, 0), (7.62, -0.485))
            Line((7.62, -0.485), (7.62, -0.675))
        make_face()
    extrude(amount=LPATTERN1_12_DEPTH)

    # LPattern1 13 outline → LPattern1 13 (add)
    with BuildSketch(Plane(origin=(0, 0, 0), x_dir=(1, 0, 0), z_dir=(0, 1, 0)).offset(LPATTERN1_START_5)):
        with BuildLine():
            ThreePointArc((7.62, 0.485), (8.105, 0), (7.62, -0.485))
            Line((7.62, -0.485), (7.62, -0.675))
            ThreePointArc((7.62, -0.675), (8.295, 0), (7.62, 0.675))
            Line((7.62, 0.675), (7.62, 0.485))
        make_face()
    extrude(amount=LPATTERN1_13_DEPTH)

    # LPattern1 14 outline → LPattern1 14 (cut)
    with BuildSketch(Plane.XY.offset(LPATTERN1_START_6)):
        with BuildLine():
            Line((10, -1.885764576), (8.295154284, -2.814011576))
            ThreePointArc((8.295154284, -2.814011576), (7.823369826, -3.25257421), (7.62, -3.863768511))
            Line((7.62, -3.863768511), (10, -3.863768611))
            Line((10, -3.863768611), (10, -1.885764576))
        make_face()
    extrude(amount=LPATTERN1_14_DEPTH, mode=Mode.SUBTRACT)


with BuildPart() as body_8:
    # LPattern1 15 outline → LPattern1 15 (new body)
    with BuildSketch(Plane(origin=(0, 0, 0), x_dir=(1, 0, 0), z_dir=(0, 1, 0)).offset(LPATTERN1_START)):
        with Locations((5.08, 0)):
            Circle(LPATTERN1_15_OUTLINE_R)
    extrude(amount=LPATTERN1_15_DEPTH)


with BuildPart() as body_9:
    # LPattern1 16 outline → LPattern1 16 (new body)
    with BuildSketch(Plane(origin=(0, 0, 0), x_dir=(1, 0, 0), z_dir=(0, 1, 0)).offset(LPATTERN1_START_2)):
        with Locations((2.54, 0)):
            Circle(LPATTERN1_16_OUTLINE_R)
    extrude(amount=LPATTERN1_16_DEPTH)

    # LPattern1 17 outline → LPattern1 17 (add)
    with BuildSketch(Plane(origin=(0, 0, 0), x_dir=(1, 0, 0), z_dir=(0, 1, 0)).offset(LPATTERN1_START_3)):
        with BuildLine():
            Line((2.54, 0.485), (2.54, 0.675))
            ThreePointArc((2.54, 0.675), (1.865, 0), (2.54, -0.675))
            Line((2.54, -0.675), (2.54, -0.485))
            ThreePointArc((2.54, -0.485), (2.055, 0), (2.54, 0.485))
        make_face()
    extrude(amount=LPATTERN1_17_DEPTH)

    # LPattern1 18 outline → LPattern1 18 (add)
    with BuildSketch(Plane(origin=(0, 0, 0), x_dir=(1, 0, 0), z_dir=(0, 1, 0)).offset(LPATTERN1_START_4)):
        with BuildLine():
            ThreePointArc((2.54, -0.675), (3.215, 0), (2.54, 0.675))
            Line((2.54, 0.675), (2.54, 0.485))
            ThreePointArc((2.54, 0.485), (3.025, 0), (2.54, -0.485))
            Line((2.54, -0.485), (2.54, -0.675))
        make_face()
    extrude(amount=LPATTERN1_18_DEPTH)

    # LPattern1 19 outline → LPattern1 19 (add)
    with BuildSketch(Plane(origin=(0, 0, 0), x_dir=(1, 0, 0), z_dir=(0, 1, 0)).offset(LPATTERN1_START_5)):
        with BuildLine():
            ThreePointArc((2.54, 0.485), (3.025, 0), (2.54, -0.485))
            Line((2.54, -0.485), (2.54, -0.675))
            ThreePointArc((2.54, -0.675), (3.215, 0), (2.54, 0.675))
            Line((2.54, 0.675), (2.54, 0.485))
        make_face()
    extrude(amount=LPATTERN1_19_DEPTH)

    # LPattern1 20 outline → LPattern1 20 (cut)
    with BuildSketch(Plane.XY.offset(LPATTERN1_START_6)):
        with BuildLine():
            Line((5, -1.842206523), (3.215154284, -2.814011576))
            ThreePointArc((3.215154284, -2.814011576), (2.743369826, -3.25257421), (2.54, -3.863768511))
            Line((2.54, -3.863768511), (5, -3.863768611))
            Line((5, -3.863768611), (5, -1.842206523))
        make_face()
    extrude(amount=LPATTERN1_20_DEPTH, mode=Mode.SUBTRACT)


with BuildPart() as body_9_1:
    # Scale1: scaled about (0, 0, 0)
    add(body_9.part.scale(SCALE1_SCALE))


with BuildPart() as body_8_1:
    # Scale1: scaled about (0, 0, 0)
    add(body_8.part.scale(SCALE1_SCALE))


with BuildPart() as body_7_1:
    # Scale1: scaled about (0, 0, 0)
    add(body_7.part.scale(SCALE1_SCALE))


with BuildPart() as body_6_1:
    # Scale1: scaled about (0, 0, 0)
    add(body_6.part.scale(SCALE1_SCALE))


with BuildPart() as part_1:
    # Scale1: scaled about (0, 0, 0)
    add(part.part.scale(SCALE1_SCALE))


with BuildPart() as body_5_1:
    # Scale1: scaled about (0, 0, 0)
    add(body_5.part.scale(SCALE1_SCALE))


with BuildPart() as body_3_1:
    # Scale1: scaled about (0, 0, 0)
    add(body_3.part.scale(SCALE1_SCALE))


with BuildPart() as body_4_1:
    # Scale1: scaled about (0, 0, 0)
    add(body_4.part.scale(SCALE1_SCALE))


with BuildPart() as body_2_1:
    # Scale1: scaled about (0, 0, 0)
    add(body_2.part.scale(SCALE1_SCALE))


solid = Compound([body_9_1.part, body_8_1.part, body_7_1.part, body_6_1.part, part_1.part, body_5_1.part, body_3_1.part, body_4_1.part, body_2_1.part])
